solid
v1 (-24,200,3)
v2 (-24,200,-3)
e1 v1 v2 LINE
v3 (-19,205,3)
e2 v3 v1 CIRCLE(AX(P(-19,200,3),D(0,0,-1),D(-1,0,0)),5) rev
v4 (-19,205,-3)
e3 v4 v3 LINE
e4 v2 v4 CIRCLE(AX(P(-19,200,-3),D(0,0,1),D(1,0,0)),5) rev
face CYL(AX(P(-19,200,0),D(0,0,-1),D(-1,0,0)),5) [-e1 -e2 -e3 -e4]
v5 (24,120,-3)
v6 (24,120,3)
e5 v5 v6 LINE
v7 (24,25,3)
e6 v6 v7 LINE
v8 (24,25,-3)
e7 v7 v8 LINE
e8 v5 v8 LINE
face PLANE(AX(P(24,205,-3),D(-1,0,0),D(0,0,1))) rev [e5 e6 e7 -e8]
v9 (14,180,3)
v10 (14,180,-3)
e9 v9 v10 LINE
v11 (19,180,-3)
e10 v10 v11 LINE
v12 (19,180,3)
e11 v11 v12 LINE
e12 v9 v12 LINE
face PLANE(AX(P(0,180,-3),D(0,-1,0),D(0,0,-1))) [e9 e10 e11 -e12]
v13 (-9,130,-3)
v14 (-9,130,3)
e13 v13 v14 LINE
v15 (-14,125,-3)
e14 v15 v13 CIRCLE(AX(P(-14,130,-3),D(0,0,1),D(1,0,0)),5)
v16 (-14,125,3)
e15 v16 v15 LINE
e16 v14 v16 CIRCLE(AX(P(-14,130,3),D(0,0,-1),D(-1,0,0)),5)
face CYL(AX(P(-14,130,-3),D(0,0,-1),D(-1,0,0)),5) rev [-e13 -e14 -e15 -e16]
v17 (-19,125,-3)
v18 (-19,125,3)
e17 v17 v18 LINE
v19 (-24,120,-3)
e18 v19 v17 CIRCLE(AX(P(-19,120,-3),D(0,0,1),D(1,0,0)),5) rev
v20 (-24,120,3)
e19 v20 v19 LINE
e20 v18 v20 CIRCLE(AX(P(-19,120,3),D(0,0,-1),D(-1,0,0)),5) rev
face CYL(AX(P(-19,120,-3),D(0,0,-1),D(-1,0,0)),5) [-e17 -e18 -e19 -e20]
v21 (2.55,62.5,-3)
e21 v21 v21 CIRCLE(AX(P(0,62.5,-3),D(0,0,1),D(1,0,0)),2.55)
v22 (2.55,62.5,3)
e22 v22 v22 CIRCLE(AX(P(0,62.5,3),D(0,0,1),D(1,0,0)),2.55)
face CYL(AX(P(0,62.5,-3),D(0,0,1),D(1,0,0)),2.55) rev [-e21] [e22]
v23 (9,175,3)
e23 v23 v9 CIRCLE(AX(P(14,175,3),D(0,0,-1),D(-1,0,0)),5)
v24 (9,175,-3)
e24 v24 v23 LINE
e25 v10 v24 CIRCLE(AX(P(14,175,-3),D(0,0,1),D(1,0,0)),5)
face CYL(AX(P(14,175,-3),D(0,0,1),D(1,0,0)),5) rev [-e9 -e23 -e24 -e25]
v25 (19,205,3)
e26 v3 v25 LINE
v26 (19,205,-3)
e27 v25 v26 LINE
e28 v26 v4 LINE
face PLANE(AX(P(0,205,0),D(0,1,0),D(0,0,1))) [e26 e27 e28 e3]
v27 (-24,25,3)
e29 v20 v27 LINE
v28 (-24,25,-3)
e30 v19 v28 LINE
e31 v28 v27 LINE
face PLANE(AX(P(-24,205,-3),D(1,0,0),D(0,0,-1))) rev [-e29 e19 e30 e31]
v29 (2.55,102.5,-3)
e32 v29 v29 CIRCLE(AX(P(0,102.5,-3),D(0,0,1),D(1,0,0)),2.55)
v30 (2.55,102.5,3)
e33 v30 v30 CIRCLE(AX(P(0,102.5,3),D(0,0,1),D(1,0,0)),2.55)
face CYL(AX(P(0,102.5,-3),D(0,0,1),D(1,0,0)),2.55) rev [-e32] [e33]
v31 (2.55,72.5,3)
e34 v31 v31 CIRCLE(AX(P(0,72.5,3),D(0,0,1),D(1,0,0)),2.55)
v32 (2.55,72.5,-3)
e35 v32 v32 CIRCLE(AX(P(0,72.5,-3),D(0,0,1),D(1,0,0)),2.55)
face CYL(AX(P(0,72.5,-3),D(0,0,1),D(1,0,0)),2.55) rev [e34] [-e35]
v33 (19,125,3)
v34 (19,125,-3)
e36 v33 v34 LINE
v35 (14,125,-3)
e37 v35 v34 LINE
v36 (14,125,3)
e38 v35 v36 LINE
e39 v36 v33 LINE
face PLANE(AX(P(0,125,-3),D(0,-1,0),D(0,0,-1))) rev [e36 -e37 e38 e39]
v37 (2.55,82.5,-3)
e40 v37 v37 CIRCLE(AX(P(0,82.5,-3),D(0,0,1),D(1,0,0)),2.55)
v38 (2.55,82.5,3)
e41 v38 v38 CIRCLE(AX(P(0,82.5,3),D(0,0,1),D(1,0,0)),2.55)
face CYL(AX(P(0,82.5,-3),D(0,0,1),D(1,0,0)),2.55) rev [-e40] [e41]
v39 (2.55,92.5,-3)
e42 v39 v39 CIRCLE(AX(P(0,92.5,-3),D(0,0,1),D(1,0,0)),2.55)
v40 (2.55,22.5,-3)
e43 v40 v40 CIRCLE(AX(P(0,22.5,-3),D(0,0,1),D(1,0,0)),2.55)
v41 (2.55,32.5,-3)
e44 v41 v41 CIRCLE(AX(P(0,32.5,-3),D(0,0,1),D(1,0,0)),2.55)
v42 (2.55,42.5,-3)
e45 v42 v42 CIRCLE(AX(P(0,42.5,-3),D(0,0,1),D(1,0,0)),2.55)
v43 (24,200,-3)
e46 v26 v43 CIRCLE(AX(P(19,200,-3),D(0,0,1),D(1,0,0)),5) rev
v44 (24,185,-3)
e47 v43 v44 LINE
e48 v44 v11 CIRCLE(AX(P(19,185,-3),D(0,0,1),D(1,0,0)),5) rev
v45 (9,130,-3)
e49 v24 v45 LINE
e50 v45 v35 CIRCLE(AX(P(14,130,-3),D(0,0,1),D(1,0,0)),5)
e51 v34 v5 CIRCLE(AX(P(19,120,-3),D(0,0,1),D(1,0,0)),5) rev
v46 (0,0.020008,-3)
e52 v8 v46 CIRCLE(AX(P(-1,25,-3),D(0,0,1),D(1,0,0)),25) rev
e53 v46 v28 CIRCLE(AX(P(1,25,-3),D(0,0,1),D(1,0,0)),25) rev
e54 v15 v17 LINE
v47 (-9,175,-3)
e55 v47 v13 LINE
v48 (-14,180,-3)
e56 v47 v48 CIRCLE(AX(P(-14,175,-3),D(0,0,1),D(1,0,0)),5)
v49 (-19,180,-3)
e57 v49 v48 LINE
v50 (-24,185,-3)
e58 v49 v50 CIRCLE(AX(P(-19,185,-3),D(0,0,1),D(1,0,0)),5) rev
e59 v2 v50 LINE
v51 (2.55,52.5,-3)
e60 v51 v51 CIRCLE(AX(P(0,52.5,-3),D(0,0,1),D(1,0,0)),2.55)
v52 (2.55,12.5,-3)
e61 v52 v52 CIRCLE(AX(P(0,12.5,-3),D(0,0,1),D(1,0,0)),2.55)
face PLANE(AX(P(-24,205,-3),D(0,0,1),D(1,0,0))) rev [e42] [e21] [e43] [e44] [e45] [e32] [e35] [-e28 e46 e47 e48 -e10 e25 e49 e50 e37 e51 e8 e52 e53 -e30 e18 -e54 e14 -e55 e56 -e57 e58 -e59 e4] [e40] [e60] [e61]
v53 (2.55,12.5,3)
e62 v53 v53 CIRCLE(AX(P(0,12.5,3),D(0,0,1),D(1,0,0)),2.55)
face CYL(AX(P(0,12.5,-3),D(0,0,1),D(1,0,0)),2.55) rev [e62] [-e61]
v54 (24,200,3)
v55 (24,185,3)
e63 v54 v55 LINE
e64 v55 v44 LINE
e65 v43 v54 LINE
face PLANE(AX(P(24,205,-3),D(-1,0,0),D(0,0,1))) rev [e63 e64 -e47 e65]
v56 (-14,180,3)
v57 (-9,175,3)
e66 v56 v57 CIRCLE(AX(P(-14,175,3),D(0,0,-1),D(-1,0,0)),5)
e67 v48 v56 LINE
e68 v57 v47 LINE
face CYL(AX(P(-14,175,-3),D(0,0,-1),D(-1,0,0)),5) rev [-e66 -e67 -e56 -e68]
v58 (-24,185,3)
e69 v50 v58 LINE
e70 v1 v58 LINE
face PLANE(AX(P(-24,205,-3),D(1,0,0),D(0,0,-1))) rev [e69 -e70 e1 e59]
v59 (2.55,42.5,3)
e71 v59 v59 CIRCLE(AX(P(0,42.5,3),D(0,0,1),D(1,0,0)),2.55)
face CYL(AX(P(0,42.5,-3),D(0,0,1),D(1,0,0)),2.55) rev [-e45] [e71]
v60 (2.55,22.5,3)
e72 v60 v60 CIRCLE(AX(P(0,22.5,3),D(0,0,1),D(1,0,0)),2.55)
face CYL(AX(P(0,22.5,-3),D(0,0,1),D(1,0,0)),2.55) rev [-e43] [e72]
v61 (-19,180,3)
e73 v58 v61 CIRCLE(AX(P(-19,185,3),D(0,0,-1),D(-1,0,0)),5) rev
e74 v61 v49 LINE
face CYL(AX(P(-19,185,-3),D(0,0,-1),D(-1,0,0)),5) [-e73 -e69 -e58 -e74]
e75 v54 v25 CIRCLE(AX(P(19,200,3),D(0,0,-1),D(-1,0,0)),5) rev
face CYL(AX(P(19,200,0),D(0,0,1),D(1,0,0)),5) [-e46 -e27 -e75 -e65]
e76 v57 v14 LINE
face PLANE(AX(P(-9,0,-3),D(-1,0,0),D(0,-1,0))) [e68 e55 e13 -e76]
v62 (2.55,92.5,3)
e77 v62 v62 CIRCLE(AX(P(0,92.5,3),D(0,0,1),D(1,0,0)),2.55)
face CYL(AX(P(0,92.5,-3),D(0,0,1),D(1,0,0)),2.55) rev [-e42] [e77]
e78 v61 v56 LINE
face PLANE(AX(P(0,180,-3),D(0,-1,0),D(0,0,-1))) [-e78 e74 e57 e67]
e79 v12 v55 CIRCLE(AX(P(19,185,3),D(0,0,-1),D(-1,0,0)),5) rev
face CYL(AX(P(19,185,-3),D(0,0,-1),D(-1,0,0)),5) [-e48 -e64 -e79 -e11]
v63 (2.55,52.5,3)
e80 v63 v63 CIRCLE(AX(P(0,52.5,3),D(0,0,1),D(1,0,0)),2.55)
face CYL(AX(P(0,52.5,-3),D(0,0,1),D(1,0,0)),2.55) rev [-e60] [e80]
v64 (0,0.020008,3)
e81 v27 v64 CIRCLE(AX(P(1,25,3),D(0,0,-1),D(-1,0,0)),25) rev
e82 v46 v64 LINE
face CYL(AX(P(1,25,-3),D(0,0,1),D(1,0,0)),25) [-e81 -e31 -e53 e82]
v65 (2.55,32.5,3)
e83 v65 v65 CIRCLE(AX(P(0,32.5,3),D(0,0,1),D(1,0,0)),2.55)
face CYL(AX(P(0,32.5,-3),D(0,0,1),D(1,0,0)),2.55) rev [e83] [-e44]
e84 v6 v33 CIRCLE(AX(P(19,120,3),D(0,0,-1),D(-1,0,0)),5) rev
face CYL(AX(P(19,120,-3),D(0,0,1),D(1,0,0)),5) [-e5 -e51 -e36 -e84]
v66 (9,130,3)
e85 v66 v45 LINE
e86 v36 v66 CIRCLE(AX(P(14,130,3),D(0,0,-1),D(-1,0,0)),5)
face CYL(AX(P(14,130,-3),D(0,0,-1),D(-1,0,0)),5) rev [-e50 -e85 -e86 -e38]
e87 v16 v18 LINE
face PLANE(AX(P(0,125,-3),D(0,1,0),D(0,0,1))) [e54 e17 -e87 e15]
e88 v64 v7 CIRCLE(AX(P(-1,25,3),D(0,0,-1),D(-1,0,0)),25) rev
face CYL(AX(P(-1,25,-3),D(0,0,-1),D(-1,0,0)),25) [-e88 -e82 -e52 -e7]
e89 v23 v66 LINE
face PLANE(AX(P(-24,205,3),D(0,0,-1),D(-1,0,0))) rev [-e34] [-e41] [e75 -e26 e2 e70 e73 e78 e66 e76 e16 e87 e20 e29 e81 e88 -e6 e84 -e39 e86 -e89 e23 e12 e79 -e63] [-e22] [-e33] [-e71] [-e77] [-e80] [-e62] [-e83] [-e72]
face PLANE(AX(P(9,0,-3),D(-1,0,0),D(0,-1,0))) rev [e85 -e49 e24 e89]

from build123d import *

# Parameters (mm, degrees)
SKETCH1_W               = 48
SKETCH1_H               = 6
BOSS_EXTRUDE1_DEPTH     = 205
FILLET1_R               = 25
SKETCH2_R               = 2.55
CUT_EXTRUDE1_DEPTH      = 207.487287744
LPATTERN1_COUNT         = 10
LPATTERN1_PITCH         = 10
CUT_EXTRUDE2_DEPTH      = 207.421898063
CUT_EXTRUDE2_DEPTH_BACK = 207.421898063
SKETCH12_W              = 15
SKETCH12_H              = 55
FILLET2_R               = 5


with BuildPart() as part:
    # Sketch1 → Boss-Extrude1 (new body)
    with BuildSketch(Plane(origin=(0, 0, 0), x_dir=(1, 0, 0), z_dir=(0, 1, 0))):
        Rectangle(SKETCH1_W, SKETCH1_H)
    extrude(amount=BOSS_EXTRUDE1_DEPTH)

    # Fillet1
    # the kernel refuses this fillet: 25 mm, written as the material it takes off along each edge
    with BuildSketch(Plane(origin=(-24, 0, 65.5), x_dir=(0, 1, 0), z_dir=(0, 0, -1)), Plane(origin=(24, 0, -65.5), x_dir=(0, 1, 0), z_dir=(0, 0, 1))) as fillet1_piece_1:
        with BuildLine():
            CenterArc((FILLET1_R, FILLET1_R), FILLET1_R, 180, 90)
            Line((0, FILLET1_R), (0, 0))
            Line((0, 0), (FILLET1_R, 0))
        make_face()
    extrude(amount=131, mode=Mode.SUBTRACT)

    # Sketch2 → Cut-Extrude1 (cut, through all)
    with BuildSketch(Plane.XY.offset(3)):
        with Locations((0, 12.5)):
            Circle(SKETCH2_R)
    cut_extrude1 = extrude(amount=-CUT_EXTRUDE1_DEPTH, mode=Mode.SUBTRACT)

    # LPattern1: Cut-Extrude1 ×10
    with Locations(*[(0, i * LPATTERN1_PITCH, 0) for i in range(1, LPATTERN1_COUNT)]):
        add(cut_extrude1, mode=Mode.SUBTRACT)

    # Sketch12 → Cut-Extrude2 (cut, two sides: drawn at the far end of the back side and taken through both)
    with BuildSketch(Plane.XY.offset(-CUT_EXTRUDE2_DEPTH_BACK)):
        with Locations((-16.5, 152.5)):
            Rectangle(SKETCH12_W, SKETCH12_H)
        with Locations((16.5, 152.5)):
            Rectangle(SKETCH12_W, SKETCH12_H)
    extrude(amount=CUT_EXTRUDE2_DEPTH + CUT_EXTRUDE2_DEPTH_BACK, mode=Mode.SUBTRACT)

    # Fillet2
    fillet2_edges = [part.edges().sort_by_distance(p)[0] for p in [
        (-24, 205, 0),
        (24, 205, 0),
        (-24, 125, 0),
        (-24, 180, 0),
        (-9, 180, 0),
        (-9, 125, 0),
        (24, 125, 0),
        (9, 125, 0),
        (9, 180, 0),
        (24, 180, 0),
    ]]
    fillet(fillet2_edges, radius=FILLET2_R)


solid = part.part
